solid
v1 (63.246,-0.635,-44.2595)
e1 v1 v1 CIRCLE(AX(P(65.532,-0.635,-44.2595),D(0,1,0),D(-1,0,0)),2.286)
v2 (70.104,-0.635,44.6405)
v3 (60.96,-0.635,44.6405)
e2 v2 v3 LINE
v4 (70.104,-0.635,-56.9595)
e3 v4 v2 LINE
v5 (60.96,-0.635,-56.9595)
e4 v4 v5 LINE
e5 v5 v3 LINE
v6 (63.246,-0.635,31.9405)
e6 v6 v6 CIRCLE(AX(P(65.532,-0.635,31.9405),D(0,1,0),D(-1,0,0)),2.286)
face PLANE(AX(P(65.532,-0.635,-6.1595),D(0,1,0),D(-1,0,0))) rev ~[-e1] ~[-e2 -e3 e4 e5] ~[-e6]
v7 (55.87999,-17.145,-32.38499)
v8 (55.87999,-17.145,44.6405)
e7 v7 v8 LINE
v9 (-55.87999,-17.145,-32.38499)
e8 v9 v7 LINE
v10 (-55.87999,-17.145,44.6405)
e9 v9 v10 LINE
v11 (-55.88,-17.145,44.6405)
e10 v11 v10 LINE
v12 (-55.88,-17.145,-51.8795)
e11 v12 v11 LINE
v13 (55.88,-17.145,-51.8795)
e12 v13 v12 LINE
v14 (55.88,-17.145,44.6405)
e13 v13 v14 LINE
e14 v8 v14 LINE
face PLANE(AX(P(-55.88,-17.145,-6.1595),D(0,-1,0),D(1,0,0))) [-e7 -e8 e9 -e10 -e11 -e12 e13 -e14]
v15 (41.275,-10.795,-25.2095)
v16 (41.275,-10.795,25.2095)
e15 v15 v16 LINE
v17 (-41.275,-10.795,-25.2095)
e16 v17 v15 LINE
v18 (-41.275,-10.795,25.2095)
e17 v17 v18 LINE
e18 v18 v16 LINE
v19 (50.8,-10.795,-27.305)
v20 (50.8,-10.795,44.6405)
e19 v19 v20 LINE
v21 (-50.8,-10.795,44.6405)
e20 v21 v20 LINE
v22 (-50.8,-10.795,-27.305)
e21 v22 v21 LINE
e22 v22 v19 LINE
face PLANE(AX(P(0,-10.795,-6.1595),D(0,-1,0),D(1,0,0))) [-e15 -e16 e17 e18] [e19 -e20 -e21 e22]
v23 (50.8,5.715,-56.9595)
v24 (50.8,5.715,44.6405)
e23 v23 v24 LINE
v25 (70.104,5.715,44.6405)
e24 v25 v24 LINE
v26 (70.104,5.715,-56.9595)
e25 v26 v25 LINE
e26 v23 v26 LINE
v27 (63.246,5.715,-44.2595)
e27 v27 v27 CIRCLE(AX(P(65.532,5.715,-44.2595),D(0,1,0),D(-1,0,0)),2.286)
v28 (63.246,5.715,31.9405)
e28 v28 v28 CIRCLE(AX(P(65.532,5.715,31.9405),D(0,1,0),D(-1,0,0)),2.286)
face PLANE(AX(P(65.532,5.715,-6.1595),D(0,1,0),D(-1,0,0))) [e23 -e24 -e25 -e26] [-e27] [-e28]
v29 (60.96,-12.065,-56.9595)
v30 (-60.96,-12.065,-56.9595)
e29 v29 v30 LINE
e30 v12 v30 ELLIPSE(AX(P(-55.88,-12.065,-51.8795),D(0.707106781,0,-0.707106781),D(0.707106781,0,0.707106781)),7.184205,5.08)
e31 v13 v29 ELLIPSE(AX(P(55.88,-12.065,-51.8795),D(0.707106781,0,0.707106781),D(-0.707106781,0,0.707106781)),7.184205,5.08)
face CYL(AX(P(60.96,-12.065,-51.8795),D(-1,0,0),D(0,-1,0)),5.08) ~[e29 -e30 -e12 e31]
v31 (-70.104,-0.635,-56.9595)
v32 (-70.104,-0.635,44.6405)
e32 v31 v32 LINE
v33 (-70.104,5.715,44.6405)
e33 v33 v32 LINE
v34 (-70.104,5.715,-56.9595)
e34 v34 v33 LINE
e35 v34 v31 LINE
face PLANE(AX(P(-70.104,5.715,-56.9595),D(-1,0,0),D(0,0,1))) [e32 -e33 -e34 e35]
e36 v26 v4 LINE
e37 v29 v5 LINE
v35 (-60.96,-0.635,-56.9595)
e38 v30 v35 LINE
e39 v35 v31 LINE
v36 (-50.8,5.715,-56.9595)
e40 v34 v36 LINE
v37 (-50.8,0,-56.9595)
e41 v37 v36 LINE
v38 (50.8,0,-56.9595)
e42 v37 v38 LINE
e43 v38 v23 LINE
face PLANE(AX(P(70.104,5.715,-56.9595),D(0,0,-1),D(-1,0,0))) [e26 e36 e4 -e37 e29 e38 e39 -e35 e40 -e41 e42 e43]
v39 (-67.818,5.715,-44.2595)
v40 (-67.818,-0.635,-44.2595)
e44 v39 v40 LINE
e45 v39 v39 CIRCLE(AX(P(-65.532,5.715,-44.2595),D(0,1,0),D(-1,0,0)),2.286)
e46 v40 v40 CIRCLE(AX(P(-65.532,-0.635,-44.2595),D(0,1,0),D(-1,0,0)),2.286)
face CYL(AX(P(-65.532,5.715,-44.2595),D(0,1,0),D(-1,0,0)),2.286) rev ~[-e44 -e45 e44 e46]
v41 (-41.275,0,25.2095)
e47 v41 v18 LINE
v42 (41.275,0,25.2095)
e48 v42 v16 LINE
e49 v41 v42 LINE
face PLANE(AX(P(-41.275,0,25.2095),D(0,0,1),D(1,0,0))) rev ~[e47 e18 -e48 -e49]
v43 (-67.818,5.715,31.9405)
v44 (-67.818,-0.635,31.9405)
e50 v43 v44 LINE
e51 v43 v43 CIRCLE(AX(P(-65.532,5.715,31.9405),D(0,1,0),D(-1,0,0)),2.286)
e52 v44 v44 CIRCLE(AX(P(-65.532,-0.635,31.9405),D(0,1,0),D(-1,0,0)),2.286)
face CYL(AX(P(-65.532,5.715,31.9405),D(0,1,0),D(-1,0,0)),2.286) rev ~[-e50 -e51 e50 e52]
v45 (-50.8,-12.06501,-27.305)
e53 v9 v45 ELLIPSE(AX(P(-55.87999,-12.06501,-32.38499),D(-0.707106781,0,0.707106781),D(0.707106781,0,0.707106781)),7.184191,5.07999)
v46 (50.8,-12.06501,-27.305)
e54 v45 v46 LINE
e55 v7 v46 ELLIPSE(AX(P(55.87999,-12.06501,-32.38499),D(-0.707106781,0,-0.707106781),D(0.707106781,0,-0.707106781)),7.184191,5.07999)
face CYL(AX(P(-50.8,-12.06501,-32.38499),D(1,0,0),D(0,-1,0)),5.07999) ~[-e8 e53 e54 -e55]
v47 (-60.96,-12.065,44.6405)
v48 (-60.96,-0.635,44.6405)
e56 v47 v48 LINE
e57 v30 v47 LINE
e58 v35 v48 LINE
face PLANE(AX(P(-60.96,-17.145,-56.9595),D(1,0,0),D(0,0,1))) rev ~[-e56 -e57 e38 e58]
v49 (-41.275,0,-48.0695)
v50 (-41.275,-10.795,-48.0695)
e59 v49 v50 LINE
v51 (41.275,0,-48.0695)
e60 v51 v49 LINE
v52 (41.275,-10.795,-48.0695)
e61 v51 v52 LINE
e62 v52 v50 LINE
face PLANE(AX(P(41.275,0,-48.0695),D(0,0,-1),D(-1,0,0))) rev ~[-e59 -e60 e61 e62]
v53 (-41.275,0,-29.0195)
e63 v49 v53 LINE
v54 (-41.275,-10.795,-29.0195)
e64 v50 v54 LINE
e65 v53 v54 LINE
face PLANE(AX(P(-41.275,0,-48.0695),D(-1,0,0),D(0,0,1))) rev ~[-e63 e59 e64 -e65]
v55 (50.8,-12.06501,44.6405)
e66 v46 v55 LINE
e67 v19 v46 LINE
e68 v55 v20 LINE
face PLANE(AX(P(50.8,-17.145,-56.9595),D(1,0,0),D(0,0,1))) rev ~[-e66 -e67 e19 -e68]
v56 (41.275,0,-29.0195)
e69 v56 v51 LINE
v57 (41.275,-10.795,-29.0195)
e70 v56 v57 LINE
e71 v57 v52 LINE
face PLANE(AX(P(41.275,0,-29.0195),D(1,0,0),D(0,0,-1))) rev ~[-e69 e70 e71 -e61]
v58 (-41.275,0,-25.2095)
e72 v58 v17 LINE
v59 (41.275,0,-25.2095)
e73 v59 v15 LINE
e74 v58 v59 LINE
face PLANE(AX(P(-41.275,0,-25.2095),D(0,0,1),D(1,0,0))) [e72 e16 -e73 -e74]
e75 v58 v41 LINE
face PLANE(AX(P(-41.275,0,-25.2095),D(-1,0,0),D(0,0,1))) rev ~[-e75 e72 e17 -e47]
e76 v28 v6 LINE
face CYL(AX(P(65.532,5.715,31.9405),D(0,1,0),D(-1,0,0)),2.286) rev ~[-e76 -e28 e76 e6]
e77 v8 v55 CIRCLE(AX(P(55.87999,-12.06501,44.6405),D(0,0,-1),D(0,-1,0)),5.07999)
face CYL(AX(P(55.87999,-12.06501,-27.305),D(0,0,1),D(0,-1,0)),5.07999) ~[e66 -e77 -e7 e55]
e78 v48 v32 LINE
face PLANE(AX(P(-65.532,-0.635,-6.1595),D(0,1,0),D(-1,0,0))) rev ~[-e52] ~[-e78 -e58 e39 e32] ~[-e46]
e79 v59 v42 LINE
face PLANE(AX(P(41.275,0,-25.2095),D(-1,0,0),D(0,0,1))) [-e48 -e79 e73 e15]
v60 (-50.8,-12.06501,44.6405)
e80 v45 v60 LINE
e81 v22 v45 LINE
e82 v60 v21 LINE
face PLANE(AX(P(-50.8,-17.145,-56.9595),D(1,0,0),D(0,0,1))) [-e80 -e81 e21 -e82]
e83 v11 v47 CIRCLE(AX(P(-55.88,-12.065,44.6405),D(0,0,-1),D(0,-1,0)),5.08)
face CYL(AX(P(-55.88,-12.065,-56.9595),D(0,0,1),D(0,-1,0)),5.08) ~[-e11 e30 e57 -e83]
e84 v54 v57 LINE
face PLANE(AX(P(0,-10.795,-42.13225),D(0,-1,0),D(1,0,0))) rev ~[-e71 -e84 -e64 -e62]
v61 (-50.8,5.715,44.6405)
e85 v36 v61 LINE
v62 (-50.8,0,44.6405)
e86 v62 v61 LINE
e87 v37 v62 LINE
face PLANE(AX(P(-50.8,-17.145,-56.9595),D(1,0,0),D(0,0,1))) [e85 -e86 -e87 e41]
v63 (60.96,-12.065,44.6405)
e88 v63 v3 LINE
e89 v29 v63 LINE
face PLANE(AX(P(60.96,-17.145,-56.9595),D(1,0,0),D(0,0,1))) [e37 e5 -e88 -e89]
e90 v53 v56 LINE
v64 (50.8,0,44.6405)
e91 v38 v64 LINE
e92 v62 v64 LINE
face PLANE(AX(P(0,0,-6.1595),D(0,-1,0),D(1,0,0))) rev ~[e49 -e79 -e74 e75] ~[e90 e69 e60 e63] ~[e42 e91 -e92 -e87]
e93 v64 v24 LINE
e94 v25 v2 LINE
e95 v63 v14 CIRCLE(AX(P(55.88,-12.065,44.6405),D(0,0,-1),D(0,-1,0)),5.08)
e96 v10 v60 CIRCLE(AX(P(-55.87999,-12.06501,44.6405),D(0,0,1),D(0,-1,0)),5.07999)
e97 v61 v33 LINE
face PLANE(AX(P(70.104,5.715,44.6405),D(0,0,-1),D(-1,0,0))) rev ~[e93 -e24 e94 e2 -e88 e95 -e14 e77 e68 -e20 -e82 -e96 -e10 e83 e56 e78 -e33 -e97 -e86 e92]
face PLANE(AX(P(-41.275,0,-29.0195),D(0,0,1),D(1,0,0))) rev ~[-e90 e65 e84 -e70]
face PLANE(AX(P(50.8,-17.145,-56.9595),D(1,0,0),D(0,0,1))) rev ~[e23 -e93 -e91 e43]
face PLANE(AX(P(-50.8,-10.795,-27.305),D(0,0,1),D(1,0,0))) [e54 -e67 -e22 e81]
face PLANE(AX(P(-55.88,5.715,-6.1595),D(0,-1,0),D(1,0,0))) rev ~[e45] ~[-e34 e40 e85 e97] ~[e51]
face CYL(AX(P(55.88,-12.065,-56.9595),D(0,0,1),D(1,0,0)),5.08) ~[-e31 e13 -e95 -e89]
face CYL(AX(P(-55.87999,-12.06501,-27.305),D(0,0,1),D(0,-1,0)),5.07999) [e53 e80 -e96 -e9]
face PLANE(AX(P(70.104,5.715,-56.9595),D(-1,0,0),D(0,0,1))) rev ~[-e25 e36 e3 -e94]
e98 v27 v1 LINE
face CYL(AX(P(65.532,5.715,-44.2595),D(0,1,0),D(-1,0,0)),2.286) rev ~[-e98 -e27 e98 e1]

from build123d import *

# Parameters (mm, degrees)
F0_W     = 101.6
F0_H     = 101.6
F0_W_2   = 82.55
F0_H_2   = 50.419
F1_DEPTH = 10.795
F2_W     = 101.6
F2_H     = 29.6545
F2_W_2   = 82.55
F2_H_2   = 19.05
F3_DEPTH = 6.35
F4_W     = 10.16
F4_H     = 101.6
F5_DEPTH = 22.86
F6_W     = 9.144
F6_H     = 101.6
F6_R     = 2.286
F7_DEPTH = 6.35
F8_R     = 5.08
F9_R     = 5.07999


# Not quite as in the source:
# - a fillet or chamfer is up to 0.001 mm smaller than in the source, because OpenCascade refuses the exact size


with BuildPart() as f1:
    # F0 (on Front) → F1 (new body)
    with BuildSketch(Plane.XZ):
        with Locations((0, -6.1595)):
            Rectangle(F0_W, F0_H)
        Polygon((-41.275, -29.0195), (0, -29.0195), (41.275, -29.0195), (41.275, -48.0695), (-41.275, -48.0695), align=None, mode=Mode.SUBTRACT)
        Rectangle(F0_W_2, F0_H_2, mode=Mode.SUBTRACT)
    extrude(amount=F1_DEPTH)

    # F2 (on face) → F3 (join)
    with BuildSketch(Plane.XZ.offset(10.795)):
        with Locations((0, -42.13225)):
            Rectangle(F2_W, F2_H)
        with Locations((0, -38.5445)):
            Rectangle(F2_W_2, F2_H_2, mode=Mode.SUBTRACT)
        with Locations((0, -38.5445)):
            Rectangle(F2_W_2, F2_H_2)
    extrude(amount=F3_DEPTH)

    # F4 (on face) → F5 (join)
    with BuildSketch(Plane.XZ.offset(17.145)):
        with Locations((-55.88, -6.1595)):
            Rectangle(F4_W, F4_H)
        with Locations((55.88, -6.1595)):
            Rectangle(F4_W, F4_H)
    extrude(amount=-F5_DEPTH)

    # F6 (on face) → F7 (join)
    with BuildSketch(Plane(origin=(0, 5.715, 0), x_dir=(-1, 0, 0), z_dir=(0, 1, 0))):
        with Locations((-65.532, -6.1595)):
            Rectangle(F6_W, F6_H)
        with Locations((-65.532, -44.2595)):
            Circle(F6_R, mode=Mode.SUBTRACT)
        with Locations((-65.532, 31.9405)):
            Circle(F6_R, mode=Mode.SUBTRACT)
        with Locations((65.532, -6.1595)):
            Rectangle(F6_W, F6_H)
        with Locations((65.532, -44.2595)):
            Circle(F6_R, mode=Mode.SUBTRACT)
        with Locations((65.532, 31.9405)):
            Circle(F6_R, mode=Mode.SUBTRACT)
    extrude(amount=-F7_DEPTH)

    # F8
    f8_edges = [f1.edges().sort_by_distance(p)[0] for p in [
        (-60.96, -17.145, -6.1595),
        (0, -17.145, -56.9595),
        (60.96, -17.145, -6.1595),
    ]]
    fillet(f8_edges, radius=F8_R)

    # F9 (radius 5.08 in the source; OpenCascade refuses exactly that, so slightly less here)
    f9_edges = [f1.edges().sort_by_distance(p)[0] for p in [
        (-50.8, -17.145, 8.66775),
        (0, -17.145, -27.305),
        (50.8, -17.145, 8.66775),
    ]]
    fillet(f9_edges, radius=F9_R)


solid = f1.part
